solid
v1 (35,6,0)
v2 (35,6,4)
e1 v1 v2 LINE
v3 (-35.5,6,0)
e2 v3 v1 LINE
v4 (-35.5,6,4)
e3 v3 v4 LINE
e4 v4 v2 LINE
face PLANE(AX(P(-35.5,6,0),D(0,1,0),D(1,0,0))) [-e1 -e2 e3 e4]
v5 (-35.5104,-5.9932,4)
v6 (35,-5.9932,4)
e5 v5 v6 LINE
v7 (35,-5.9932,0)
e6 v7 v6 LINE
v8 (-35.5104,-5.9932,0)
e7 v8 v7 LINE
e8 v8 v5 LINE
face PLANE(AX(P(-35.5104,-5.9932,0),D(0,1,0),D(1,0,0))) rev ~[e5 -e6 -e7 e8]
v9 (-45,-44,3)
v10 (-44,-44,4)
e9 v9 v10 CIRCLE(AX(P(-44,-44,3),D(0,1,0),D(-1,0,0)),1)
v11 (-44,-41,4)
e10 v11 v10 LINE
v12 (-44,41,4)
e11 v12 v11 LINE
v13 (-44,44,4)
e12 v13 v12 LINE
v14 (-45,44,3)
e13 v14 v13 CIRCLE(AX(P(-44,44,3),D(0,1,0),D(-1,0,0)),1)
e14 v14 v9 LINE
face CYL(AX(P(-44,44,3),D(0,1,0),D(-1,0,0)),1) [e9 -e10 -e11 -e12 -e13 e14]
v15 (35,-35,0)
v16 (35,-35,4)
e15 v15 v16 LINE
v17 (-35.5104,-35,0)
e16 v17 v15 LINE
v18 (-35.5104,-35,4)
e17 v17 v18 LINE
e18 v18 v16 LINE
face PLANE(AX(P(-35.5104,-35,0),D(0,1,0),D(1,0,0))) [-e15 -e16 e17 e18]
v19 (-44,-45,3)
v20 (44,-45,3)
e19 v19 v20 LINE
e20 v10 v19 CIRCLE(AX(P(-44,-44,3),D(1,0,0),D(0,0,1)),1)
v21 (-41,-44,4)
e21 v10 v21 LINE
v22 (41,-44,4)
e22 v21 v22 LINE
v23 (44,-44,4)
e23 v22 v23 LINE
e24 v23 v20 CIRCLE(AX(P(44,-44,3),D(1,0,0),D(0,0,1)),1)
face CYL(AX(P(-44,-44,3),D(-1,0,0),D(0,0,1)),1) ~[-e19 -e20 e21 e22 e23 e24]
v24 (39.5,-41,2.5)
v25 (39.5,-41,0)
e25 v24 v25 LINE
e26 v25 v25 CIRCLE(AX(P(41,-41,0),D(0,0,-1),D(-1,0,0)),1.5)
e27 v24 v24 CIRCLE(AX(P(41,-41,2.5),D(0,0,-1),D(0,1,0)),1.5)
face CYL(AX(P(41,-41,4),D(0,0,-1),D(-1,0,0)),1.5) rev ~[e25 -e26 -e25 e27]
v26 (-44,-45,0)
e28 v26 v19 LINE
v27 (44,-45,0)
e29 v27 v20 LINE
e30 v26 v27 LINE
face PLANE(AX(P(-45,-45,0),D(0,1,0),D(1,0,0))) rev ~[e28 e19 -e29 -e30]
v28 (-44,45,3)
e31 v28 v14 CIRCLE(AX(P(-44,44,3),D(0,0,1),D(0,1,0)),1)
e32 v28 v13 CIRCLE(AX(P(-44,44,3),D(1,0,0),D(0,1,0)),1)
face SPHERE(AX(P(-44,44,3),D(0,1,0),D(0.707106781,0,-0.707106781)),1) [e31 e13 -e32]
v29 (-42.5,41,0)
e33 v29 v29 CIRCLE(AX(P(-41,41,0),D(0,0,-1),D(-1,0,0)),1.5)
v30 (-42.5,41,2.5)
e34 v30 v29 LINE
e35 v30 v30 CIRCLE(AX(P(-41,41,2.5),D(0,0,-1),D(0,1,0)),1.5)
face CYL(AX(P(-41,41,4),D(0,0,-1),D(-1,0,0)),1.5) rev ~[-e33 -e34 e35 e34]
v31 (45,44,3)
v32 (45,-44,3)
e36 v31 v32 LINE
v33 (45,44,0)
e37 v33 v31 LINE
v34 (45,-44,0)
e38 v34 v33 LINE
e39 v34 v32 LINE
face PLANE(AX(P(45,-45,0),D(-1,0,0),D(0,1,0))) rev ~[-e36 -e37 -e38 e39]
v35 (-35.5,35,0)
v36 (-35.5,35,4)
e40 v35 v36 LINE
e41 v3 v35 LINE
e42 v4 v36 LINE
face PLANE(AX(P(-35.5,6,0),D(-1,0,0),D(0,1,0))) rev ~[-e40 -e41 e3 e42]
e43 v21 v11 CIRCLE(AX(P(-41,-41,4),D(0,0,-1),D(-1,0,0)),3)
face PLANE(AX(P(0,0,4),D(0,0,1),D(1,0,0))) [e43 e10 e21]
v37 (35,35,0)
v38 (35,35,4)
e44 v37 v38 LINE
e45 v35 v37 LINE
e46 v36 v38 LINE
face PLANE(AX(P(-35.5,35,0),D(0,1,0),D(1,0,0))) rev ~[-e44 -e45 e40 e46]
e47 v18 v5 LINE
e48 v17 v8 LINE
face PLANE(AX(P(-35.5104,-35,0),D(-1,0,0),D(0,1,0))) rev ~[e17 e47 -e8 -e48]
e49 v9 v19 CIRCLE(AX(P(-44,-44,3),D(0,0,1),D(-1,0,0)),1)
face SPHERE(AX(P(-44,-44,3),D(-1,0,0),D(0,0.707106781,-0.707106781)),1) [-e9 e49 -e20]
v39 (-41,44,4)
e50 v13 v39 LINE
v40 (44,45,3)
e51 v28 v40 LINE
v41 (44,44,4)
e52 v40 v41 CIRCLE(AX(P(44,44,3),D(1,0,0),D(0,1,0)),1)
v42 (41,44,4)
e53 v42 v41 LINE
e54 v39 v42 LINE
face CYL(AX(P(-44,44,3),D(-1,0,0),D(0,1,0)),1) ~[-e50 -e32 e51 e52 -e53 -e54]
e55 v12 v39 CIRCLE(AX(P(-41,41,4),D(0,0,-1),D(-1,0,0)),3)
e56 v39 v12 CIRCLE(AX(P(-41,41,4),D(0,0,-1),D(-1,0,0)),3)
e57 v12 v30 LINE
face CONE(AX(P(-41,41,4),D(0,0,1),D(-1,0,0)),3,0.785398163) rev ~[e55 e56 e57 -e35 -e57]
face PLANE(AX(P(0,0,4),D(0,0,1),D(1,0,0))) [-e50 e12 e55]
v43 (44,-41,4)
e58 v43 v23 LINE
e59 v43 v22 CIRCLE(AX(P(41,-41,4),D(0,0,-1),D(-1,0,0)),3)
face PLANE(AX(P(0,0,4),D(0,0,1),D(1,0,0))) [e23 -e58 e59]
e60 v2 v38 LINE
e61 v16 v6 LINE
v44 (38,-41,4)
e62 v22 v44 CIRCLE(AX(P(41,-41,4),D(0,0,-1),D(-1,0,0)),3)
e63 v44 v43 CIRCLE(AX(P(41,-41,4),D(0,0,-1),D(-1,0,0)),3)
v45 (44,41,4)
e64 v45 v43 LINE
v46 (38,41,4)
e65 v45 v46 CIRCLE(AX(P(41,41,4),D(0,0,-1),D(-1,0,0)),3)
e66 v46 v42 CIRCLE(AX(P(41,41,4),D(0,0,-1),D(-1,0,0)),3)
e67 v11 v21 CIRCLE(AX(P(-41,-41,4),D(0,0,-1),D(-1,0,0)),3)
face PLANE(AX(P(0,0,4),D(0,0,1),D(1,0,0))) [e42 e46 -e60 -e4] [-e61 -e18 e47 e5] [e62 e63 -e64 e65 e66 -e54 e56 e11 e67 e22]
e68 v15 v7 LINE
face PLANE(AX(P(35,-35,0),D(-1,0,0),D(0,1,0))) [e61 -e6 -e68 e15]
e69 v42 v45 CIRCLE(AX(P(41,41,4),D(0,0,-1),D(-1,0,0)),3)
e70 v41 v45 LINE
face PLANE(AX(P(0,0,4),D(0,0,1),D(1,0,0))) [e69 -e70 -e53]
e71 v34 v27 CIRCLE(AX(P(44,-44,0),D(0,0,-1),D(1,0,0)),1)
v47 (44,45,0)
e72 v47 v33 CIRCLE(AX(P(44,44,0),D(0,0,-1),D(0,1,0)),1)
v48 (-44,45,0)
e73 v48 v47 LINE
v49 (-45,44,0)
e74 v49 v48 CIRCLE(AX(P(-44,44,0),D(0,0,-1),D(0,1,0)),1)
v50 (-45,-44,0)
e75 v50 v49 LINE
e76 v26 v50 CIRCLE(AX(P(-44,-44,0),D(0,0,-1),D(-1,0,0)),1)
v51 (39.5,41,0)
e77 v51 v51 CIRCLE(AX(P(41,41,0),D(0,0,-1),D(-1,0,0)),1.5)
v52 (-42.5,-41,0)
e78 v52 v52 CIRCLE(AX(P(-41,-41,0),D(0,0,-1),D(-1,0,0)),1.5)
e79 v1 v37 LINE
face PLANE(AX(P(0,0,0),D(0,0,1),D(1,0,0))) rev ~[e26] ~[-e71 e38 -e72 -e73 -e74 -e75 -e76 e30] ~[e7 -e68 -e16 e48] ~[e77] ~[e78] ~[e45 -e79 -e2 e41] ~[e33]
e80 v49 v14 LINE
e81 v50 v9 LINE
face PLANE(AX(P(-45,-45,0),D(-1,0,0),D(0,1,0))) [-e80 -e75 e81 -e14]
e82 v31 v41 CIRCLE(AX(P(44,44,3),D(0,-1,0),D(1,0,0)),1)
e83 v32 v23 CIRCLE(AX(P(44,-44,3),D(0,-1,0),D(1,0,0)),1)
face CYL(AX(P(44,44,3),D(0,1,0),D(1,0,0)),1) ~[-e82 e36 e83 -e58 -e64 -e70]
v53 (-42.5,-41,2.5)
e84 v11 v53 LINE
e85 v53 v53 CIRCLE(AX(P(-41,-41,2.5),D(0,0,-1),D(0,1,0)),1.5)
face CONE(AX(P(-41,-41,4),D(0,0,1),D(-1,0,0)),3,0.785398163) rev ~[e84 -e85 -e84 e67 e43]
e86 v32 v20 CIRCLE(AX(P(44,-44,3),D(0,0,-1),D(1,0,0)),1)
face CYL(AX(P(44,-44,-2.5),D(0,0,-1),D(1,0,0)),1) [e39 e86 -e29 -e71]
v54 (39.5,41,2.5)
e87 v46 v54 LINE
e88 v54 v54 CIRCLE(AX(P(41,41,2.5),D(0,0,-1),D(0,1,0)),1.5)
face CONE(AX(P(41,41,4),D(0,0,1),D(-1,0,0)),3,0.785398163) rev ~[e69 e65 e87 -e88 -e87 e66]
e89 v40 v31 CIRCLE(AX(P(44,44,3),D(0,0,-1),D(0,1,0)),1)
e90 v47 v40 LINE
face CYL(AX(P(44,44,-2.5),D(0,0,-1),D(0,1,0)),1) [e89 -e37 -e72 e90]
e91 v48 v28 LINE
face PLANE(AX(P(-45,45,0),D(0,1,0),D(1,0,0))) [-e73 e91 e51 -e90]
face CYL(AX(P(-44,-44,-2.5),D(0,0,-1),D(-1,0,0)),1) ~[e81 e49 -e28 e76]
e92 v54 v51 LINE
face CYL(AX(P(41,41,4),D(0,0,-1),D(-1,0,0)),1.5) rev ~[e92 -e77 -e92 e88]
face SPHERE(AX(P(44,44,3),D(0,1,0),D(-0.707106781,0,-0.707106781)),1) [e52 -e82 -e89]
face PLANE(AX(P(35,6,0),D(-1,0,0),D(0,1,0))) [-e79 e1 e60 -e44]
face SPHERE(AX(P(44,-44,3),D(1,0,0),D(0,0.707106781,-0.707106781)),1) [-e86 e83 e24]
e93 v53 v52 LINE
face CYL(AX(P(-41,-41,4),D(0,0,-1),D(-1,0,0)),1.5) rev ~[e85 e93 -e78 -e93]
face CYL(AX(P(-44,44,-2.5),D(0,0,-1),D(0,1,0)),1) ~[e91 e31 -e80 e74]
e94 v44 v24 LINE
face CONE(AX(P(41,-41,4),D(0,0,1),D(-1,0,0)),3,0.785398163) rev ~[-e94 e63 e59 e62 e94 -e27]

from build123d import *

# Parameters (mm, degrees)
F0_W           = 90
F0_H           = 90
F0_W_2         = 70.5104
F0_H_2         = 29.0068
F0_W_3         = 70.5
F0_H_3         = 29
F1_DEPTH       = 4
F3_D           = 3
F3_CSINK_D     = 6
F3_CSINK_ANGLE = 90
F4_T1_DEPTH    = 88
F4_T3_DEPTH    = 88
F4_T5_DEPTH    = 5.5
F4_S9_W        = 1
F4_S9_H        = 1
F4_T10_DEPTH   = 1
F4_S15_W       = 1
F4_S15_H       = 1
F4_T16_DEPTH   = 1
F4_S21_W       = 1
F4_S21_H       = 1
F4_T22_DEPTH   = 1
F4_S27_W       = 1
F4_S27_H       = 1
F4_T28_DEPTH   = 1


# Not quite as in the source:
# - a fillet or chamfer that OpenCascade refuses, or shapes differently, is made with other operations: its cross-section is extruded or revolved along the edge and cut away or added


with BuildPart() as f1:
    # F0 (on Top) → F1 (new body)
    with BuildSketch(Plane.XY):
        Rectangle(F0_W, F0_H)
        with Locations((-0.2552, -20.4966)):
            Rectangle(F0_W_2, F0_H_2, mode=Mode.SUBTRACT)
        with Locations((-0.25, 20.5)):
            Rectangle(F0_W_3, F0_H_3, mode=Mode.SUBTRACT)
    extrude(amount=F1_DEPTH)

    # F3 (through all)
    with Locations(Plane.XY.offset(4)):
        with Locations((-41, 41), (41, 41), (41, -41), (-41, -41)):
            CounterSinkHole(F3_D / 2, F3_CSINK_D / 2, counter_sink_angle=F3_CSINK_ANGLE)

    # F4: fillet of radius 1 on 8 edges, made by hand

    # F4_s2 → F4_t1 (cut)
    with BuildSketch(Plane.YZ.offset(-44)):
        with BuildLine():
            ThreePointArc((45, 3), (44.7071067812, 3.7071067812), (44, 4))
            Line((44, 4), (45, 4))
            Line((45, 4), (45, 3))
        make_face()
        with BuildLine():
            ThreePointArc((-44, 4), (-44.7071067812, 3.7071067812), (-45, 3))
            Line((-45, 3), (-45, 4))
            Line((-45, 4), (-44, 4))
        make_face()
    extrude(amount=F4_T1_DEPTH, mode=Mode.SUBTRACT)

    # F4_s4 → F4_t3 (cut)
    with BuildSketch(Plane.XZ.offset(-44)):
        with BuildLine():
            ThreePointArc((-45, 3), (-44.7071067812, 3.7071067812), (-44, 4))
            Line((-44, 4), (-45, 4))
            Line((-45, 4), (-45, 3))
        make_face()
        with BuildLine():
            ThreePointArc((45, 3), (44.7071067812, 3.7071067812), (44, 4))
            Line((44, 4), (45, 4))
            Line((45, 4), (45, 3))
        make_face()
    extrude(amount=F4_T3_DEPTH, mode=Mode.SUBTRACT)

    # F4_s6 → F4_t5 (cut)
    with BuildSketch(Plane.XY.offset(-2.5)):
        with BuildLine():
            ThreePointArc((45, -44), (44.7071067812, -44.7071067812), (44, -45))
            Line((44, -45), (45, -45))
            Line((45, -45), (45, -44))
        make_face()
        with BuildLine():
            ThreePointArc((44, 45), (44.7071067812, 44.7071067812), (45, 44))
            Line((45, 44), (45, 45))
            Line((45, 45), (44, 45))
        make_face()
        with BuildLine():
            ThreePointArc((-44, 45), (-44.7071067812, 44.7071067812), (-45, 44))
            Line((-45, 44), (-45, 45))
            Line((-45, 45), (-44, 45))
        make_face()
        with BuildLine():
            ThreePointArc((-45, -44), (-44.7071067812, -44.7071067812), (-44, -45))
            Line((-44, -45), (-45, -45))
            Line((-45, -45), (-45, -44))
        make_face()
    extrude(amount=F4_T5_DEPTH, mode=Mode.SUBTRACT)


with BuildPart() as f4_tool8:
    # F4_s9 → F4_t10 (new body)
    with BuildSketch(Plane.XZ.offset(-44)):
        with Locations((44.5, 3.5)):
            Rectangle(F4_S9_W, F4_S9_H)
    extrude(amount=-F4_T10_DEPTH)

    # F4_s11 → F4_t12 (revolve, cut)
    with BuildSketch(Plane(origin=(44, 44, 3), x_dir=(-0.7071067812, 0, -0.7071067812), z_dir=(0.7071067812, 0, -0.7071067812))):
        with BuildLine():
            ThreePointArc((0, -1), (1, 0), (0, 1))
            Line((0, 1), (0, -1))
        make_face()
    revolve(axis=Axis((44, 44, 3), (0, 1, 0)), mode=Mode.SUBTRACT)


with BuildPart() as f1_1:
    add(f1.part)

    # F4_t7: cut F4_tool8
    add(f4_tool8.part, mode=Mode.SUBTRACT)


with BuildPart() as f4_tool14:
    # F4_s15 → F4_t16 (new body)
    with BuildSketch(Plane.XZ.offset(-44)):
        with Locations((-44.5, 3.5)):
            Rectangle(F4_S15_W, F4_S15_H)
    extrude(amount=-F4_T16_DEPTH)

    # F4_s17 → F4_t18 (revolve, cut)
    with BuildSketch(Plane(origin=(-44, 44, 3), x_dir=(0.7071067812, 0, -0.7071067812), z_dir=(0.7071067812, 0, 0.7071067812))):
        with BuildLine():
            ThreePointArc((0, -1), (1, 0), (0, 1))
            Line((0, 1), (0, -1))
        make_face()
    revolve(axis=Axis((-44, 44, 3), (0, 1, 0)), mode=Mode.SUBTRACT)


with BuildPart() as f1_2:
    add(f1_1.part)

    # F4_t13: cut F4_tool14
    add(f4_tool14.part, mode=Mode.SUBTRACT)


with BuildPart() as f4_tool20:
    # F4_s21 → F4_t22 (new body)
    with BuildSketch(Plane.YZ.offset(-44)):
        with Locations((-44.5, 3.5)):
            Rectangle(F4_S21_W, F4_S21_H)
    extrude(amount=-F4_T22_DEPTH)

    # F4_s23 → F4_t24 (revolve, cut)
    with BuildSketch(Plane(origin=(-44, -44, 3), x_dir=(0, 0.7071067812, -0.7071067812), z_dir=(0, 0.7071067812, 0.7071067812))):
        with BuildLine():
            ThreePointArc((0, -1), (1, 0), (0, 1))
            Line((0, 1), (0, -1))
        make_face()
    revolve(axis=Axis((-44, -44, 3), (-1, 0, 0)), mode=Mode.SUBTRACT)


with BuildPart() as f1_3:
    add(f1_2.part)

    # F4_t19: cut F4_tool20
    add(f4_tool20.part, mode=Mode.SUBTRACT)


with BuildPart() as f4_tool26:
    # F4_s27 → F4_t28 (new body)
    with BuildSketch(Plane.YZ.offset(44)):
        with Locations((-44.5, 3.5)):
            Rectangle(F4_S27_W, F4_S27_H)
    extrude(amount=F4_T28_DEPTH)

    # F4_s29 → F4_t30 (revolve, cut)
    with BuildSketch(Plane(origin=(44, -44, 3), x_dir=(0, 0.7071067812, -0.7071067812), z_dir=(0, -0.7071067812, -0.7071067812))):
        with BuildLine():
            ThreePointArc((0, -1), (1, 0), (0, 1))
            Line((0, 1), (0, -1))
        make_face()
    revolve(axis=Axis((44, -44, 3), (1, 0, 0)), mode=Mode.SUBTRACT)


with BuildPart() as f1_4:
    add(f1_3.part)

    # F4_t25: cut F4_tool26
    add(f4_tool26.part, mode=Mode.SUBTRACT)


solid = f1_4.part
